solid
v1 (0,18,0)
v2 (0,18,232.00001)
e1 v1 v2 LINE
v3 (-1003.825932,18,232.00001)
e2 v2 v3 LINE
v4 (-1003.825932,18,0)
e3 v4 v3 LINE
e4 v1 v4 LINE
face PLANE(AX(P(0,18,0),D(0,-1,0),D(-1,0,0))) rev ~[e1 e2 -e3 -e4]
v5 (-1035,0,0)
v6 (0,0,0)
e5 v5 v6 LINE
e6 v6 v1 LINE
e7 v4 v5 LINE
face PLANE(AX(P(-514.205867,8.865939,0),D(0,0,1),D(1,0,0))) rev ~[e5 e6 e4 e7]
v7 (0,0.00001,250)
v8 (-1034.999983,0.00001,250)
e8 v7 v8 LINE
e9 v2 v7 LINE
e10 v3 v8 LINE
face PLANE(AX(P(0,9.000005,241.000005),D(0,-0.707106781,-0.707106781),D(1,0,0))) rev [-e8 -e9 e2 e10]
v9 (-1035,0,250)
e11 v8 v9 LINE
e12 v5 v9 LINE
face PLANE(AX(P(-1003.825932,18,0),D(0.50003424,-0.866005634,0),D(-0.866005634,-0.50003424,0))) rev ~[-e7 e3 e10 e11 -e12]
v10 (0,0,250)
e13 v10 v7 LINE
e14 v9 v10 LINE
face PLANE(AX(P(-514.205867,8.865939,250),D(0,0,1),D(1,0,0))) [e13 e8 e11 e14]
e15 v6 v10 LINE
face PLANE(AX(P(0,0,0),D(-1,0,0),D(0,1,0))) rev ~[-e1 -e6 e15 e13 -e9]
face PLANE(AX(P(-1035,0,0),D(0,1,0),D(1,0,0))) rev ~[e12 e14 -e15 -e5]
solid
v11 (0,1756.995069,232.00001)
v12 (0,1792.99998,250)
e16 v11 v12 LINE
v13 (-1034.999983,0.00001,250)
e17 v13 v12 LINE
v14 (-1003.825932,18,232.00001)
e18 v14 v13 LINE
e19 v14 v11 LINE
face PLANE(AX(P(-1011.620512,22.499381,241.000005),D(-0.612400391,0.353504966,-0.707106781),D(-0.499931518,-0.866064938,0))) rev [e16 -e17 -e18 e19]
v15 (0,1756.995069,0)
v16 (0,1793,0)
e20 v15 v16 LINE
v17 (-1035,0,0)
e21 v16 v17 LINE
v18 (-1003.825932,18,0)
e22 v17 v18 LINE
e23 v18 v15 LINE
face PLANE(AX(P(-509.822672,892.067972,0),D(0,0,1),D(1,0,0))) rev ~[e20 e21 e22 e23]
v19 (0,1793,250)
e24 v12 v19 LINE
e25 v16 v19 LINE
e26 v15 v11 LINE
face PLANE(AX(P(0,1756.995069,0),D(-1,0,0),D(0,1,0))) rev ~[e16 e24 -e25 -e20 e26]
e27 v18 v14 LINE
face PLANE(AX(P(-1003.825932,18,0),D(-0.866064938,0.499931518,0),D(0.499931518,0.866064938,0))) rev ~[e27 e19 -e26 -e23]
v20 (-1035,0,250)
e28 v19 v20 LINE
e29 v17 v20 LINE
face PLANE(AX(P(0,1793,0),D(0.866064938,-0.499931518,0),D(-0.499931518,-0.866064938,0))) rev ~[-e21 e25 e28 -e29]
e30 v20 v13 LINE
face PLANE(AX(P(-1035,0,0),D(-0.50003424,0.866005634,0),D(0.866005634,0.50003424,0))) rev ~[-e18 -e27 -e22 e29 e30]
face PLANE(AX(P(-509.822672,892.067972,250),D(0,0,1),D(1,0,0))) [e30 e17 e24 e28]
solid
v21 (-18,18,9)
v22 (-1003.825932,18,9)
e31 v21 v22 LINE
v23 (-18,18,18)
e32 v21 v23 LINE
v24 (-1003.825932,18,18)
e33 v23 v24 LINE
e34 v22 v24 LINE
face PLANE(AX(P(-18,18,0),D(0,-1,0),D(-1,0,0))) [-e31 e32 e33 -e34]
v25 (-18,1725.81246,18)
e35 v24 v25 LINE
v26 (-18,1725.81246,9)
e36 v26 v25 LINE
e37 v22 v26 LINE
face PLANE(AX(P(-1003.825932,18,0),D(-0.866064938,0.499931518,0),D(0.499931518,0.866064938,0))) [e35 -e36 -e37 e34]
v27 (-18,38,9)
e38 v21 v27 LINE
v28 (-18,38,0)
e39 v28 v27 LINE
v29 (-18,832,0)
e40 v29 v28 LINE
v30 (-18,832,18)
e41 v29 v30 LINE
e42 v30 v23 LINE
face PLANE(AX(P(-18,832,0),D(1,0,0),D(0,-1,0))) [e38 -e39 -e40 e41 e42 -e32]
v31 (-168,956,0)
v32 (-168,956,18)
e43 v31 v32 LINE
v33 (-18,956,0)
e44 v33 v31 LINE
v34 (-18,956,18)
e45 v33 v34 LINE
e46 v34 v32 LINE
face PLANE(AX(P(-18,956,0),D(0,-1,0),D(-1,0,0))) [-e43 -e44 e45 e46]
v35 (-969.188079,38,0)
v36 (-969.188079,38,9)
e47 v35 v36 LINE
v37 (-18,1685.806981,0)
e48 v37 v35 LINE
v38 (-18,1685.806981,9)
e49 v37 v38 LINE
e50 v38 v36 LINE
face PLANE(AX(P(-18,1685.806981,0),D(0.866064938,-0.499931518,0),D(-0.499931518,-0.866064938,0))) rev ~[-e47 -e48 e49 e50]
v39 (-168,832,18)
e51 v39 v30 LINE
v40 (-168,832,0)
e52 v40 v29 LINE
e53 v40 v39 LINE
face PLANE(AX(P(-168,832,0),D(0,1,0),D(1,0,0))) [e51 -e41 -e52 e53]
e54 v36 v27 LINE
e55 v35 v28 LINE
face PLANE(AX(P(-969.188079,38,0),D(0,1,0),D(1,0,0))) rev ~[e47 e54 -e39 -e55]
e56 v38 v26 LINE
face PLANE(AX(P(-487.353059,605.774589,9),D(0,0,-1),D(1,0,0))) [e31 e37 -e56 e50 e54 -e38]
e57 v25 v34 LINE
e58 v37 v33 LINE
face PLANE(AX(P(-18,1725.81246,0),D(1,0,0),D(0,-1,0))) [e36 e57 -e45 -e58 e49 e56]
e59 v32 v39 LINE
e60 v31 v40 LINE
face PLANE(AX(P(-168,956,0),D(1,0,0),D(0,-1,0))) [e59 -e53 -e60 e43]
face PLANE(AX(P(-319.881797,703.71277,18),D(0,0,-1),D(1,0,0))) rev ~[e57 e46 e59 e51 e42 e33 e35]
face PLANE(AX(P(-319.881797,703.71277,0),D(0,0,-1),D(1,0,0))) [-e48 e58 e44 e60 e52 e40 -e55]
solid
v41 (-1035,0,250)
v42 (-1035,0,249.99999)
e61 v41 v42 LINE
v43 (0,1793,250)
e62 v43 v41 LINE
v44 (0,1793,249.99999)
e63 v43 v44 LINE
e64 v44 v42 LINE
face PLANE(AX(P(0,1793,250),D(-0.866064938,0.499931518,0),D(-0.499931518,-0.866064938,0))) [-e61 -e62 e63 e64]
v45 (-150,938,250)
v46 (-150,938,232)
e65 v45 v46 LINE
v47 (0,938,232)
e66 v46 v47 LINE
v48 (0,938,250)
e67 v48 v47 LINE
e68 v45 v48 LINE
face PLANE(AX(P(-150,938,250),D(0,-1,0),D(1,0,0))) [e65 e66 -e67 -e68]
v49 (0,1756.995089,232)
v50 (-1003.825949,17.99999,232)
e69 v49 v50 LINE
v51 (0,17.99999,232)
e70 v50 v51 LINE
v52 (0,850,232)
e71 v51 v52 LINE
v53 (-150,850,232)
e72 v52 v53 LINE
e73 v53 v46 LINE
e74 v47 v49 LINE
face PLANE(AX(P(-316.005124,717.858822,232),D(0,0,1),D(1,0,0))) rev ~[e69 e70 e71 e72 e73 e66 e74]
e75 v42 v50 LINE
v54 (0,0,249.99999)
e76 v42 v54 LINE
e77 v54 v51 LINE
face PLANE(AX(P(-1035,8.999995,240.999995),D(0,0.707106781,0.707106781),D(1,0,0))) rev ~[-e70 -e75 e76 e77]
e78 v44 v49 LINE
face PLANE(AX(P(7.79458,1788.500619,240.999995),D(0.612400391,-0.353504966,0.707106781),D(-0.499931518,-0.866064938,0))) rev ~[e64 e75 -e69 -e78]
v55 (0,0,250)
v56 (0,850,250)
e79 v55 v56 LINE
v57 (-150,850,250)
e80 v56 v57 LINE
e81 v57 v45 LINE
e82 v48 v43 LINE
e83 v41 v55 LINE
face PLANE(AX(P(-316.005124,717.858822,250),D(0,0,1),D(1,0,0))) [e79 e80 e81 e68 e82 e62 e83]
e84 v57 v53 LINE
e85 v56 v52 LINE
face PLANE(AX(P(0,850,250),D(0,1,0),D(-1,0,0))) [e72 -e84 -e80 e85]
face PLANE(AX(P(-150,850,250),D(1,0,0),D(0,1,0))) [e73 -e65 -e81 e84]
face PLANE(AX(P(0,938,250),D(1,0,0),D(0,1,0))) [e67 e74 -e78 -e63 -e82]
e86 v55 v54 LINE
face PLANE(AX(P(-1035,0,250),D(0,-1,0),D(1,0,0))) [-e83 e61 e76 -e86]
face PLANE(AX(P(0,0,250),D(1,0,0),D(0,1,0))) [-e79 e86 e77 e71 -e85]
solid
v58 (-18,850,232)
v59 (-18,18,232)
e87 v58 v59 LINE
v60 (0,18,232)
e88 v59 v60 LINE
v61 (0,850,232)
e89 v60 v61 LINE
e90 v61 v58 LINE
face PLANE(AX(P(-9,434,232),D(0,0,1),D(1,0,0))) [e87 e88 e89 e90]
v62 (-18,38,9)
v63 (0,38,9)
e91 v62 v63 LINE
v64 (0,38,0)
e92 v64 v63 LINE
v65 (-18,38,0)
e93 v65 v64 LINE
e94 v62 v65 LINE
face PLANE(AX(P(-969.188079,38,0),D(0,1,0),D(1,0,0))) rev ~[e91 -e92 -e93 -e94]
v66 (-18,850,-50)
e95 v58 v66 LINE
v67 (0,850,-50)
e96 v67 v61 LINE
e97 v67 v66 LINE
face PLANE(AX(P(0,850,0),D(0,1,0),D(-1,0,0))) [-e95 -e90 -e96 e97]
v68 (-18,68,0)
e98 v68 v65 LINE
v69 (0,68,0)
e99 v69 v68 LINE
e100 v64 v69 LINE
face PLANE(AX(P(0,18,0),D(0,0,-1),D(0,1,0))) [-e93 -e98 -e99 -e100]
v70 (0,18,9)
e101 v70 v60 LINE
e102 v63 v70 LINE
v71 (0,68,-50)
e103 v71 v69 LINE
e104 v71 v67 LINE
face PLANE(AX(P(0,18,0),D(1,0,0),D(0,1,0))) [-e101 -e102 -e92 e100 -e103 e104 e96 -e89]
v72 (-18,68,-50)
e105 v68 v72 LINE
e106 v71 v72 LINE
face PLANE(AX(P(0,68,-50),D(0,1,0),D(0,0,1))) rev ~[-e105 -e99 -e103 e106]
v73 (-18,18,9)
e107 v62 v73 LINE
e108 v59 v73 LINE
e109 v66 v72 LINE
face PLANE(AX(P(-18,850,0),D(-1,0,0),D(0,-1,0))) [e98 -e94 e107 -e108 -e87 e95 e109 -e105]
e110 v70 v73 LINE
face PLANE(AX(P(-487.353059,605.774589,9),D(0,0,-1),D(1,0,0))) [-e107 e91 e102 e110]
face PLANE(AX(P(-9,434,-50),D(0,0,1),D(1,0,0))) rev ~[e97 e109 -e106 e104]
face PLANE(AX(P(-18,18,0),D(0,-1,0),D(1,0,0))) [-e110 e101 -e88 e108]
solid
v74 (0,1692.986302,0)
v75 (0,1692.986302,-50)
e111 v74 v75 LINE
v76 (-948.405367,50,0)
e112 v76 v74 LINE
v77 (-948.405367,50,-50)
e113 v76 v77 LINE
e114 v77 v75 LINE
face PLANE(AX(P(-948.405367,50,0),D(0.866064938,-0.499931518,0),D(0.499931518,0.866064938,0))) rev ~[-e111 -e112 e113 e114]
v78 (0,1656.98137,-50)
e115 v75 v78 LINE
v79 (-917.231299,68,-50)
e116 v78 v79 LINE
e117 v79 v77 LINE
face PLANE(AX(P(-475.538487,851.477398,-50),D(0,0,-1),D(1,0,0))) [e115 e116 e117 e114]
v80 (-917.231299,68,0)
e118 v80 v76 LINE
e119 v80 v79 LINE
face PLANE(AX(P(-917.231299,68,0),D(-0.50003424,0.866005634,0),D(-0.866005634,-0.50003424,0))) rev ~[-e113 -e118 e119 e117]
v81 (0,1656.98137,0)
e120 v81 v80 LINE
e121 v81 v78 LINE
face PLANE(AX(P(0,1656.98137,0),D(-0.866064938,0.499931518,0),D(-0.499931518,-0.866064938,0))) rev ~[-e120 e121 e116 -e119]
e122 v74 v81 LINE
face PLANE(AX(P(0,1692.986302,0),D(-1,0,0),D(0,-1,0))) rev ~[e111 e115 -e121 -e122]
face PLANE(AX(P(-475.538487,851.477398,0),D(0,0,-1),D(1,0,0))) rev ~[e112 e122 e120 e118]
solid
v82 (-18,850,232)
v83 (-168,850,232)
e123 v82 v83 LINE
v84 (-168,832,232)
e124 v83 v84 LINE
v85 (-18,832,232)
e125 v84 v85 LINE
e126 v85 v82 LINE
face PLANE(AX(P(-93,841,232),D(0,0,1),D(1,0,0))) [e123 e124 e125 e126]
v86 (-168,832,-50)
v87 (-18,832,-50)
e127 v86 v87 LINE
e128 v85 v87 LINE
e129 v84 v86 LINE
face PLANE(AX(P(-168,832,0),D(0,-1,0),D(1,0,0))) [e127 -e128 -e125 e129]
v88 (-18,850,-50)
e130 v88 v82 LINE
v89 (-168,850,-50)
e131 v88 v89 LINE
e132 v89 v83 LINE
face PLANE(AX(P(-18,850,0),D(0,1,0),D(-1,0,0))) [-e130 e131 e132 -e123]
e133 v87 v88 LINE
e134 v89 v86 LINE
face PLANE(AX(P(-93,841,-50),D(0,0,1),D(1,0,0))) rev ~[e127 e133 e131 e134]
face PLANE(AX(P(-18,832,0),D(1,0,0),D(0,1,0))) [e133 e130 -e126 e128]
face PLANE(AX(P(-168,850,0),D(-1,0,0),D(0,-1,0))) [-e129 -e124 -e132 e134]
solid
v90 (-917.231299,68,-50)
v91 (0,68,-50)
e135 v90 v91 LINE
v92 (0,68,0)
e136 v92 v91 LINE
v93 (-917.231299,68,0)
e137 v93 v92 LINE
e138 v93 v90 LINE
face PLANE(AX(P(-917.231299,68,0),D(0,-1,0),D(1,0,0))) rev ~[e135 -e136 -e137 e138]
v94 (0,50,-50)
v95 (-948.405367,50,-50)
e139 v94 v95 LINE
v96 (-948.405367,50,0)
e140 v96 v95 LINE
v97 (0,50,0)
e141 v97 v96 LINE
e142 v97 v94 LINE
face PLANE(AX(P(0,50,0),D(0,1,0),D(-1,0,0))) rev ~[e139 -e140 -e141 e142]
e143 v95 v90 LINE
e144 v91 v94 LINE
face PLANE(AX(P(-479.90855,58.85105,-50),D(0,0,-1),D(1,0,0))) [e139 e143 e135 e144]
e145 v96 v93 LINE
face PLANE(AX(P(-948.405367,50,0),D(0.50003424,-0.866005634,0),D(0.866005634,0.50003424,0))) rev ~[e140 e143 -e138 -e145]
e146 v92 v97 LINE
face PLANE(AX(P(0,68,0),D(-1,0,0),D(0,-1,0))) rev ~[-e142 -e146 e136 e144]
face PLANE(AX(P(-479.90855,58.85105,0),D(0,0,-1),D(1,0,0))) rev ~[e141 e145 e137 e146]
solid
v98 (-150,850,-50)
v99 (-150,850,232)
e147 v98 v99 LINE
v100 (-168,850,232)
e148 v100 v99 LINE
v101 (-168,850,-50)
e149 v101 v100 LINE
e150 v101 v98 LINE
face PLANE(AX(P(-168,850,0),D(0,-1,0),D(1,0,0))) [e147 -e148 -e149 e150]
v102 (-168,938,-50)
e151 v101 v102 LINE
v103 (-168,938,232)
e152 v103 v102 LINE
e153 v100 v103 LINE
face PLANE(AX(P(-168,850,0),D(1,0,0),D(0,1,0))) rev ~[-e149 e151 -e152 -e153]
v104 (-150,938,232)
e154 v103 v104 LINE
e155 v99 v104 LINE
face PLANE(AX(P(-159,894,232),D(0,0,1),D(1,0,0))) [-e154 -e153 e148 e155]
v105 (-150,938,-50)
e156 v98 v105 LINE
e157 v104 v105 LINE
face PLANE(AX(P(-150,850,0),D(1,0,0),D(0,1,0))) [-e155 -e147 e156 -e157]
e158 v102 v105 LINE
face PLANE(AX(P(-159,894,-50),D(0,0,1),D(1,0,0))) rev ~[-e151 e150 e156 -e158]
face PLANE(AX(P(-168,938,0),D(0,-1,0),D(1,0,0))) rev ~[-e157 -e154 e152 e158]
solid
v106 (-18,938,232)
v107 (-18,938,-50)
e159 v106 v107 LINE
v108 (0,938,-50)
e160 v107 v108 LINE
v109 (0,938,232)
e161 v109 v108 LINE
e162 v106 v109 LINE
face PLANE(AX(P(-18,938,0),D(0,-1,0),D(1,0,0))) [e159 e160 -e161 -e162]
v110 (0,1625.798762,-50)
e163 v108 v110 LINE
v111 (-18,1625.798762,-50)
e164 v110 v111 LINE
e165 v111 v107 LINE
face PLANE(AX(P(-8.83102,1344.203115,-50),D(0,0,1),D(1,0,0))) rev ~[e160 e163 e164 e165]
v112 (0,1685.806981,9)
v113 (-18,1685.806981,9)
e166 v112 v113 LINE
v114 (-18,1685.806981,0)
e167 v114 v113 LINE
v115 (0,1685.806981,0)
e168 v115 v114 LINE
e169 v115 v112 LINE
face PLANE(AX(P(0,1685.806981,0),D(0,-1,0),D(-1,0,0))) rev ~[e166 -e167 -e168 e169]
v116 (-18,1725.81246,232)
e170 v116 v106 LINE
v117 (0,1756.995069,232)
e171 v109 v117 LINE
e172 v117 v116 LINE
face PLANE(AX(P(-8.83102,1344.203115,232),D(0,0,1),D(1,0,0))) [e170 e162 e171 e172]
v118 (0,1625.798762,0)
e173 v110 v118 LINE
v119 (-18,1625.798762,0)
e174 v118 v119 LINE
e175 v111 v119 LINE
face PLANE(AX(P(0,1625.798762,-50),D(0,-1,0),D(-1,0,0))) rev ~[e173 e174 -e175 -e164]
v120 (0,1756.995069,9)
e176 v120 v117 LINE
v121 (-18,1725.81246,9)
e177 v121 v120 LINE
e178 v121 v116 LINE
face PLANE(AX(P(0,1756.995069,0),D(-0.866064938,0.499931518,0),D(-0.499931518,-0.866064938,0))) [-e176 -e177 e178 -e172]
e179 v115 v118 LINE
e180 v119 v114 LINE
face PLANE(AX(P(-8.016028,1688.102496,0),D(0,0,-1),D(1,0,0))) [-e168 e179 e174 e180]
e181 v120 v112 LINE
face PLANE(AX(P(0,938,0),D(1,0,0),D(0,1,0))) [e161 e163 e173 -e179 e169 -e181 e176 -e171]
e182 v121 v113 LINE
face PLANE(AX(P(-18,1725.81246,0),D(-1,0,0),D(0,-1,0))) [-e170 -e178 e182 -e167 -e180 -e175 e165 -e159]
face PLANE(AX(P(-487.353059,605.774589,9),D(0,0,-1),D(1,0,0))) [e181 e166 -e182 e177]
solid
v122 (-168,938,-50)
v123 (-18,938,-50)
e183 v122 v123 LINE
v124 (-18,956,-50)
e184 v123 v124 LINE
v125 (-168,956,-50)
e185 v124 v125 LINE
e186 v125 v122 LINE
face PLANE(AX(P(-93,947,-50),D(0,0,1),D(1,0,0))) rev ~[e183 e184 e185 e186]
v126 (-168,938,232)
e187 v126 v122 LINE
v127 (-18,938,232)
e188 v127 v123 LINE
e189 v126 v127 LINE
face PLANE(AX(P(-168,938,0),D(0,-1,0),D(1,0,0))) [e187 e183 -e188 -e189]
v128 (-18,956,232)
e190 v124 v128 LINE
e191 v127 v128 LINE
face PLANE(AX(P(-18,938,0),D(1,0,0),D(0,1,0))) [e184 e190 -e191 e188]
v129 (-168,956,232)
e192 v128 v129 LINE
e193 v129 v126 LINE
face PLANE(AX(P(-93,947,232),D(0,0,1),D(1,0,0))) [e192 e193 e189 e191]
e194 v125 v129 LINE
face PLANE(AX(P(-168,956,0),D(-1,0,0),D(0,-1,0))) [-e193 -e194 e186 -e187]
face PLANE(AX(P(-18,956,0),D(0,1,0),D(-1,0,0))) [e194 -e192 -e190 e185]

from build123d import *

# Parameters (mm, degrees)
F1_DEPTH      = 250
F2_DEPTH      = 250
F3_DEPTH      = 232
F3_DEPTH_BACK = 50
F0_W          = 18
F0_H          = 88
F4_DEPTH      = 232
F4_DEPTH_BACK = 50
F5_SIZE       = 17.99999
F5_2_SIZE     = 17.99999
F6_W          = 50
F6_H          = 50
F7_DEPTH      = 25
F9_DEPTH      = 50
F11_DEPTH     = 18
F13_DEPTH     = 50
F12_W         = 18
F12_H         = 18
F14_DEPTH     = 50
F17_DEPTH     = 18
F18_SIZE      = 17.99999
F20_DEPTH     = 9


# Not quite as in the source:
# - a fillet or chamfer is up to 0.001 mm smaller than in the source, because OpenCascade refuses the exact size


with BuildPart() as f1:
    # F0 (on Top) → F1 (new body)
    with BuildSketch(Plane.XY):
        Polygon((0, 1793), (-1035, 0), (-1003.8259319586, 18), (-18, 1725.8124599051), (0, 1756.9950686007), align=None)
    extrude(amount=F1_DEPTH)

    # F5 (size 18 in the source; OpenCascade refuses exactly that, so slightly less here)
    f5_edges = [f1.edges().sort_by_distance(p)[0] for p in [
        (-501.912966, 887.497534, 250),
    ]]
    chamfer(f5_edges, length=F5_SIZE)


with BuildPart() as f2:
    # F0 (on Top) → F2 (new body)
    with BuildSketch(Plane.XY):
        Polygon((-1035, 0), (0, 0), (0, 18), (-18, 18), (-1003.8259319586, 18), align=None)
    extrude(amount=F2_DEPTH)

    # F5#2 (size 18 in the source; OpenCascade refuses exactly that, so slightly less here)
    f5_2_edges = [f2.edges().sort_by_distance(p)[0] for p in [
        (-501.912966, 18, 250),
    ]]
    chamfer(f5_2_edges, length=F5_2_SIZE)


with BuildPart() as f3:
    # F0 (on Top) → F3 (new body, two sides)
    with BuildSketch(Plane.XY) as f3_sk:
        Polygon((-18, 18), (0, 18), (0, 850), (-18, 850), (-18, 832), align=None)
    extrude(amount=F3_DEPTH)
    extrude(f3_sk.sketch, amount=-F3_DEPTH_BACK)

    # F6 (on face) → F7 (cut)
    with BuildSketch(Plane.YZ):
        with Locations((43, -25)):
            Rectangle(F6_W, F6_H)
    extrude(amount=-F7_DEPTH, mode=Mode.SUBTRACT)


with BuildPart() as f3b:
    # F0 (on Top) → F3, piece 2 (new body, two sides)
    with BuildSketch(Plane.XY) as f3_2_sk:
        Polygon((0, 938), (0, 1756.9950686007), (-18, 1725.8124599051), (-18, 956), (-18, 938), align=None)
    extrude(amount=F3_DEPTH)
    extrude(f3_2_sk.sketch, amount=-F3_DEPTH_BACK)

    # F8 (on face) → F9 (cut)
    with BuildSketch(Plane(origin=(0, 0, -50), x_dir=(1, 0, 0), z_dir=(0, 0, -1))):
        Polygon((-18, -1625.7987615738), (-18, -1725.8124599051), (0, -1756.9950686007), (0, -1656.9813702694), (0, -1625.7987615738), align=None)
    extrude(amount=-F9_DEPTH, mode=Mode.SUBTRACT)


with BuildPart() as f3c:
    # F0 (on Top) → F3, piece 3 (new body, two sides)
    with BuildSketch(Plane.XY) as f3_3_sk:
        with Locations((-159, 894)):
            Rectangle(F0_W, F0_H)
    extrude(amount=F3_DEPTH)
    extrude(f3_3_sk.sketch, amount=-F3_DEPTH_BACK)


with BuildPart() as f4:
    # F0 (on Top) → F4 (new body, two sides)
    with BuildSketch(Plane.XY) as f4_sk:
        Polygon((-18, 938), (-18, 956), (-168, 956), (-168, 938), (-150, 938), align=None)
    extrude(amount=F4_DEPTH)
    extrude(f4_sk.sketch, amount=-F4_DEPTH_BACK)


with BuildPart() as f4b:
    # F0 (on Top) → F4, piece 2 (new body, two sides)
    with BuildSketch(Plane.XY) as f4_2_sk:
        Polygon((-18, 832), (-18, 850), (-150, 850), (-168, 850), (-168, 832), align=None)
    extrude(amount=F4_DEPTH)
    extrude(f4_2_sk.sketch, amount=-F4_DEPTH_BACK)


with BuildPart() as f11:
    # F10 (on face) → F11 (new body)
    with BuildSketch(Plane(origin=(0, 0, 0), x_dir=(1, 0, 0), z_dir=(0, 0, -1))):
        Polygon((-18, -18), (-1003.8259319586, -18), (-18, -1725.8124599051), (-18, -1625.7987615738), (-18, -956), (-168, -956), (-168, -832), (-18, -832), (-18, -68), align=None)
    extrude(amount=-F11_DEPTH)


with BuildPart() as f13:
    # F12 (on face) → F13 (new body)
    with BuildSketch(Plane(origin=(0, 0, 0), x_dir=(1, 0, 0), z_dir=(0, 0, -1))):
        Polygon((-948.4053665516, -50), (-18, -1661.803692973), (-18, -1625.7987615738), (-917.2312985102, -68), align=None)
        Polygon((-18, -1661.803692973), (0, -1692.9863016687), (0, -1656.9813702694), (-18, -1625.7987615738), align=None)
    extrude(amount=F13_DEPTH)


with BuildPart() as f14:
    # F12 (on face) → F14 (new body)
    with BuildSketch(Plane(origin=(0, 0, 0), x_dir=(1, 0, 0), z_dir=(0, 0, -1))):
        Polygon((-18, -50), (-948.4053665516, -50), (-917.2312985102, -68), (-18, -68), align=None)
        with Locations((-9, -59)):
            Rectangle(F12_W, F12_H)
    extrude(amount=F14_DEPTH)


with BuildPart() as f17:
    # F16 (on offset) → F17 (new body)
    with BuildSketch(Plane.XY.offset(250)):
        Polygon((-1035, 0), (0, 0), (0, 850), (-150, 850), (-150, 938), (0, 938), (0, 1793), align=None)
    extrude(amount=-F17_DEPTH)

    # F18 (size 18 in the source; OpenCascade refuses exactly that, so slightly less here)
    f18_edges = [f17.edges().sort_by_distance(p)[0] for p in [
        (-517.5, 896.5, 232),
        (-517.5, 0, 232),
    ]]
    chamfer(f18_edges, length=F18_SIZE)


with BuildPart() as f20_tool:
    # F19 (on face) → F20 (new body)
    with BuildSketch(Plane(origin=(0, 0, 0), x_dir=(1, 0, 0), z_dir=(0, 0, -1))):
        Polygon((0, -38), (0, -18), (-1003.8259319586, -18), (0, -1756.9950686007), (0, -1685.8069805726), (-18, -1685.8069805726), (-969.1880785792, -38), align=None)
    extrude(amount=-F20_DEPTH)


with BuildPart() as f3_1:
    add(f3.part)

    # F20: cut by f20_tool
    add(f20_tool.part, mode=Mode.SUBTRACT)


with BuildPart() as f3b_1:
    add(f3b.part)

    # F20: cut by f20_tool
    add(f20_tool.part, mode=Mode.SUBTRACT)


with BuildPart() as f11_1:
    add(f11.part)

    # F20: cut by f20_tool
    add(f20_tool.part, mode=Mode.SUBTRACT)


solid = Compound([f1.part, f2.part, f3c.part, f4.part, f4b.part, f13.part, f14.part, f17.part, f3_1.part, f3b_1.part, f11_1.part])
